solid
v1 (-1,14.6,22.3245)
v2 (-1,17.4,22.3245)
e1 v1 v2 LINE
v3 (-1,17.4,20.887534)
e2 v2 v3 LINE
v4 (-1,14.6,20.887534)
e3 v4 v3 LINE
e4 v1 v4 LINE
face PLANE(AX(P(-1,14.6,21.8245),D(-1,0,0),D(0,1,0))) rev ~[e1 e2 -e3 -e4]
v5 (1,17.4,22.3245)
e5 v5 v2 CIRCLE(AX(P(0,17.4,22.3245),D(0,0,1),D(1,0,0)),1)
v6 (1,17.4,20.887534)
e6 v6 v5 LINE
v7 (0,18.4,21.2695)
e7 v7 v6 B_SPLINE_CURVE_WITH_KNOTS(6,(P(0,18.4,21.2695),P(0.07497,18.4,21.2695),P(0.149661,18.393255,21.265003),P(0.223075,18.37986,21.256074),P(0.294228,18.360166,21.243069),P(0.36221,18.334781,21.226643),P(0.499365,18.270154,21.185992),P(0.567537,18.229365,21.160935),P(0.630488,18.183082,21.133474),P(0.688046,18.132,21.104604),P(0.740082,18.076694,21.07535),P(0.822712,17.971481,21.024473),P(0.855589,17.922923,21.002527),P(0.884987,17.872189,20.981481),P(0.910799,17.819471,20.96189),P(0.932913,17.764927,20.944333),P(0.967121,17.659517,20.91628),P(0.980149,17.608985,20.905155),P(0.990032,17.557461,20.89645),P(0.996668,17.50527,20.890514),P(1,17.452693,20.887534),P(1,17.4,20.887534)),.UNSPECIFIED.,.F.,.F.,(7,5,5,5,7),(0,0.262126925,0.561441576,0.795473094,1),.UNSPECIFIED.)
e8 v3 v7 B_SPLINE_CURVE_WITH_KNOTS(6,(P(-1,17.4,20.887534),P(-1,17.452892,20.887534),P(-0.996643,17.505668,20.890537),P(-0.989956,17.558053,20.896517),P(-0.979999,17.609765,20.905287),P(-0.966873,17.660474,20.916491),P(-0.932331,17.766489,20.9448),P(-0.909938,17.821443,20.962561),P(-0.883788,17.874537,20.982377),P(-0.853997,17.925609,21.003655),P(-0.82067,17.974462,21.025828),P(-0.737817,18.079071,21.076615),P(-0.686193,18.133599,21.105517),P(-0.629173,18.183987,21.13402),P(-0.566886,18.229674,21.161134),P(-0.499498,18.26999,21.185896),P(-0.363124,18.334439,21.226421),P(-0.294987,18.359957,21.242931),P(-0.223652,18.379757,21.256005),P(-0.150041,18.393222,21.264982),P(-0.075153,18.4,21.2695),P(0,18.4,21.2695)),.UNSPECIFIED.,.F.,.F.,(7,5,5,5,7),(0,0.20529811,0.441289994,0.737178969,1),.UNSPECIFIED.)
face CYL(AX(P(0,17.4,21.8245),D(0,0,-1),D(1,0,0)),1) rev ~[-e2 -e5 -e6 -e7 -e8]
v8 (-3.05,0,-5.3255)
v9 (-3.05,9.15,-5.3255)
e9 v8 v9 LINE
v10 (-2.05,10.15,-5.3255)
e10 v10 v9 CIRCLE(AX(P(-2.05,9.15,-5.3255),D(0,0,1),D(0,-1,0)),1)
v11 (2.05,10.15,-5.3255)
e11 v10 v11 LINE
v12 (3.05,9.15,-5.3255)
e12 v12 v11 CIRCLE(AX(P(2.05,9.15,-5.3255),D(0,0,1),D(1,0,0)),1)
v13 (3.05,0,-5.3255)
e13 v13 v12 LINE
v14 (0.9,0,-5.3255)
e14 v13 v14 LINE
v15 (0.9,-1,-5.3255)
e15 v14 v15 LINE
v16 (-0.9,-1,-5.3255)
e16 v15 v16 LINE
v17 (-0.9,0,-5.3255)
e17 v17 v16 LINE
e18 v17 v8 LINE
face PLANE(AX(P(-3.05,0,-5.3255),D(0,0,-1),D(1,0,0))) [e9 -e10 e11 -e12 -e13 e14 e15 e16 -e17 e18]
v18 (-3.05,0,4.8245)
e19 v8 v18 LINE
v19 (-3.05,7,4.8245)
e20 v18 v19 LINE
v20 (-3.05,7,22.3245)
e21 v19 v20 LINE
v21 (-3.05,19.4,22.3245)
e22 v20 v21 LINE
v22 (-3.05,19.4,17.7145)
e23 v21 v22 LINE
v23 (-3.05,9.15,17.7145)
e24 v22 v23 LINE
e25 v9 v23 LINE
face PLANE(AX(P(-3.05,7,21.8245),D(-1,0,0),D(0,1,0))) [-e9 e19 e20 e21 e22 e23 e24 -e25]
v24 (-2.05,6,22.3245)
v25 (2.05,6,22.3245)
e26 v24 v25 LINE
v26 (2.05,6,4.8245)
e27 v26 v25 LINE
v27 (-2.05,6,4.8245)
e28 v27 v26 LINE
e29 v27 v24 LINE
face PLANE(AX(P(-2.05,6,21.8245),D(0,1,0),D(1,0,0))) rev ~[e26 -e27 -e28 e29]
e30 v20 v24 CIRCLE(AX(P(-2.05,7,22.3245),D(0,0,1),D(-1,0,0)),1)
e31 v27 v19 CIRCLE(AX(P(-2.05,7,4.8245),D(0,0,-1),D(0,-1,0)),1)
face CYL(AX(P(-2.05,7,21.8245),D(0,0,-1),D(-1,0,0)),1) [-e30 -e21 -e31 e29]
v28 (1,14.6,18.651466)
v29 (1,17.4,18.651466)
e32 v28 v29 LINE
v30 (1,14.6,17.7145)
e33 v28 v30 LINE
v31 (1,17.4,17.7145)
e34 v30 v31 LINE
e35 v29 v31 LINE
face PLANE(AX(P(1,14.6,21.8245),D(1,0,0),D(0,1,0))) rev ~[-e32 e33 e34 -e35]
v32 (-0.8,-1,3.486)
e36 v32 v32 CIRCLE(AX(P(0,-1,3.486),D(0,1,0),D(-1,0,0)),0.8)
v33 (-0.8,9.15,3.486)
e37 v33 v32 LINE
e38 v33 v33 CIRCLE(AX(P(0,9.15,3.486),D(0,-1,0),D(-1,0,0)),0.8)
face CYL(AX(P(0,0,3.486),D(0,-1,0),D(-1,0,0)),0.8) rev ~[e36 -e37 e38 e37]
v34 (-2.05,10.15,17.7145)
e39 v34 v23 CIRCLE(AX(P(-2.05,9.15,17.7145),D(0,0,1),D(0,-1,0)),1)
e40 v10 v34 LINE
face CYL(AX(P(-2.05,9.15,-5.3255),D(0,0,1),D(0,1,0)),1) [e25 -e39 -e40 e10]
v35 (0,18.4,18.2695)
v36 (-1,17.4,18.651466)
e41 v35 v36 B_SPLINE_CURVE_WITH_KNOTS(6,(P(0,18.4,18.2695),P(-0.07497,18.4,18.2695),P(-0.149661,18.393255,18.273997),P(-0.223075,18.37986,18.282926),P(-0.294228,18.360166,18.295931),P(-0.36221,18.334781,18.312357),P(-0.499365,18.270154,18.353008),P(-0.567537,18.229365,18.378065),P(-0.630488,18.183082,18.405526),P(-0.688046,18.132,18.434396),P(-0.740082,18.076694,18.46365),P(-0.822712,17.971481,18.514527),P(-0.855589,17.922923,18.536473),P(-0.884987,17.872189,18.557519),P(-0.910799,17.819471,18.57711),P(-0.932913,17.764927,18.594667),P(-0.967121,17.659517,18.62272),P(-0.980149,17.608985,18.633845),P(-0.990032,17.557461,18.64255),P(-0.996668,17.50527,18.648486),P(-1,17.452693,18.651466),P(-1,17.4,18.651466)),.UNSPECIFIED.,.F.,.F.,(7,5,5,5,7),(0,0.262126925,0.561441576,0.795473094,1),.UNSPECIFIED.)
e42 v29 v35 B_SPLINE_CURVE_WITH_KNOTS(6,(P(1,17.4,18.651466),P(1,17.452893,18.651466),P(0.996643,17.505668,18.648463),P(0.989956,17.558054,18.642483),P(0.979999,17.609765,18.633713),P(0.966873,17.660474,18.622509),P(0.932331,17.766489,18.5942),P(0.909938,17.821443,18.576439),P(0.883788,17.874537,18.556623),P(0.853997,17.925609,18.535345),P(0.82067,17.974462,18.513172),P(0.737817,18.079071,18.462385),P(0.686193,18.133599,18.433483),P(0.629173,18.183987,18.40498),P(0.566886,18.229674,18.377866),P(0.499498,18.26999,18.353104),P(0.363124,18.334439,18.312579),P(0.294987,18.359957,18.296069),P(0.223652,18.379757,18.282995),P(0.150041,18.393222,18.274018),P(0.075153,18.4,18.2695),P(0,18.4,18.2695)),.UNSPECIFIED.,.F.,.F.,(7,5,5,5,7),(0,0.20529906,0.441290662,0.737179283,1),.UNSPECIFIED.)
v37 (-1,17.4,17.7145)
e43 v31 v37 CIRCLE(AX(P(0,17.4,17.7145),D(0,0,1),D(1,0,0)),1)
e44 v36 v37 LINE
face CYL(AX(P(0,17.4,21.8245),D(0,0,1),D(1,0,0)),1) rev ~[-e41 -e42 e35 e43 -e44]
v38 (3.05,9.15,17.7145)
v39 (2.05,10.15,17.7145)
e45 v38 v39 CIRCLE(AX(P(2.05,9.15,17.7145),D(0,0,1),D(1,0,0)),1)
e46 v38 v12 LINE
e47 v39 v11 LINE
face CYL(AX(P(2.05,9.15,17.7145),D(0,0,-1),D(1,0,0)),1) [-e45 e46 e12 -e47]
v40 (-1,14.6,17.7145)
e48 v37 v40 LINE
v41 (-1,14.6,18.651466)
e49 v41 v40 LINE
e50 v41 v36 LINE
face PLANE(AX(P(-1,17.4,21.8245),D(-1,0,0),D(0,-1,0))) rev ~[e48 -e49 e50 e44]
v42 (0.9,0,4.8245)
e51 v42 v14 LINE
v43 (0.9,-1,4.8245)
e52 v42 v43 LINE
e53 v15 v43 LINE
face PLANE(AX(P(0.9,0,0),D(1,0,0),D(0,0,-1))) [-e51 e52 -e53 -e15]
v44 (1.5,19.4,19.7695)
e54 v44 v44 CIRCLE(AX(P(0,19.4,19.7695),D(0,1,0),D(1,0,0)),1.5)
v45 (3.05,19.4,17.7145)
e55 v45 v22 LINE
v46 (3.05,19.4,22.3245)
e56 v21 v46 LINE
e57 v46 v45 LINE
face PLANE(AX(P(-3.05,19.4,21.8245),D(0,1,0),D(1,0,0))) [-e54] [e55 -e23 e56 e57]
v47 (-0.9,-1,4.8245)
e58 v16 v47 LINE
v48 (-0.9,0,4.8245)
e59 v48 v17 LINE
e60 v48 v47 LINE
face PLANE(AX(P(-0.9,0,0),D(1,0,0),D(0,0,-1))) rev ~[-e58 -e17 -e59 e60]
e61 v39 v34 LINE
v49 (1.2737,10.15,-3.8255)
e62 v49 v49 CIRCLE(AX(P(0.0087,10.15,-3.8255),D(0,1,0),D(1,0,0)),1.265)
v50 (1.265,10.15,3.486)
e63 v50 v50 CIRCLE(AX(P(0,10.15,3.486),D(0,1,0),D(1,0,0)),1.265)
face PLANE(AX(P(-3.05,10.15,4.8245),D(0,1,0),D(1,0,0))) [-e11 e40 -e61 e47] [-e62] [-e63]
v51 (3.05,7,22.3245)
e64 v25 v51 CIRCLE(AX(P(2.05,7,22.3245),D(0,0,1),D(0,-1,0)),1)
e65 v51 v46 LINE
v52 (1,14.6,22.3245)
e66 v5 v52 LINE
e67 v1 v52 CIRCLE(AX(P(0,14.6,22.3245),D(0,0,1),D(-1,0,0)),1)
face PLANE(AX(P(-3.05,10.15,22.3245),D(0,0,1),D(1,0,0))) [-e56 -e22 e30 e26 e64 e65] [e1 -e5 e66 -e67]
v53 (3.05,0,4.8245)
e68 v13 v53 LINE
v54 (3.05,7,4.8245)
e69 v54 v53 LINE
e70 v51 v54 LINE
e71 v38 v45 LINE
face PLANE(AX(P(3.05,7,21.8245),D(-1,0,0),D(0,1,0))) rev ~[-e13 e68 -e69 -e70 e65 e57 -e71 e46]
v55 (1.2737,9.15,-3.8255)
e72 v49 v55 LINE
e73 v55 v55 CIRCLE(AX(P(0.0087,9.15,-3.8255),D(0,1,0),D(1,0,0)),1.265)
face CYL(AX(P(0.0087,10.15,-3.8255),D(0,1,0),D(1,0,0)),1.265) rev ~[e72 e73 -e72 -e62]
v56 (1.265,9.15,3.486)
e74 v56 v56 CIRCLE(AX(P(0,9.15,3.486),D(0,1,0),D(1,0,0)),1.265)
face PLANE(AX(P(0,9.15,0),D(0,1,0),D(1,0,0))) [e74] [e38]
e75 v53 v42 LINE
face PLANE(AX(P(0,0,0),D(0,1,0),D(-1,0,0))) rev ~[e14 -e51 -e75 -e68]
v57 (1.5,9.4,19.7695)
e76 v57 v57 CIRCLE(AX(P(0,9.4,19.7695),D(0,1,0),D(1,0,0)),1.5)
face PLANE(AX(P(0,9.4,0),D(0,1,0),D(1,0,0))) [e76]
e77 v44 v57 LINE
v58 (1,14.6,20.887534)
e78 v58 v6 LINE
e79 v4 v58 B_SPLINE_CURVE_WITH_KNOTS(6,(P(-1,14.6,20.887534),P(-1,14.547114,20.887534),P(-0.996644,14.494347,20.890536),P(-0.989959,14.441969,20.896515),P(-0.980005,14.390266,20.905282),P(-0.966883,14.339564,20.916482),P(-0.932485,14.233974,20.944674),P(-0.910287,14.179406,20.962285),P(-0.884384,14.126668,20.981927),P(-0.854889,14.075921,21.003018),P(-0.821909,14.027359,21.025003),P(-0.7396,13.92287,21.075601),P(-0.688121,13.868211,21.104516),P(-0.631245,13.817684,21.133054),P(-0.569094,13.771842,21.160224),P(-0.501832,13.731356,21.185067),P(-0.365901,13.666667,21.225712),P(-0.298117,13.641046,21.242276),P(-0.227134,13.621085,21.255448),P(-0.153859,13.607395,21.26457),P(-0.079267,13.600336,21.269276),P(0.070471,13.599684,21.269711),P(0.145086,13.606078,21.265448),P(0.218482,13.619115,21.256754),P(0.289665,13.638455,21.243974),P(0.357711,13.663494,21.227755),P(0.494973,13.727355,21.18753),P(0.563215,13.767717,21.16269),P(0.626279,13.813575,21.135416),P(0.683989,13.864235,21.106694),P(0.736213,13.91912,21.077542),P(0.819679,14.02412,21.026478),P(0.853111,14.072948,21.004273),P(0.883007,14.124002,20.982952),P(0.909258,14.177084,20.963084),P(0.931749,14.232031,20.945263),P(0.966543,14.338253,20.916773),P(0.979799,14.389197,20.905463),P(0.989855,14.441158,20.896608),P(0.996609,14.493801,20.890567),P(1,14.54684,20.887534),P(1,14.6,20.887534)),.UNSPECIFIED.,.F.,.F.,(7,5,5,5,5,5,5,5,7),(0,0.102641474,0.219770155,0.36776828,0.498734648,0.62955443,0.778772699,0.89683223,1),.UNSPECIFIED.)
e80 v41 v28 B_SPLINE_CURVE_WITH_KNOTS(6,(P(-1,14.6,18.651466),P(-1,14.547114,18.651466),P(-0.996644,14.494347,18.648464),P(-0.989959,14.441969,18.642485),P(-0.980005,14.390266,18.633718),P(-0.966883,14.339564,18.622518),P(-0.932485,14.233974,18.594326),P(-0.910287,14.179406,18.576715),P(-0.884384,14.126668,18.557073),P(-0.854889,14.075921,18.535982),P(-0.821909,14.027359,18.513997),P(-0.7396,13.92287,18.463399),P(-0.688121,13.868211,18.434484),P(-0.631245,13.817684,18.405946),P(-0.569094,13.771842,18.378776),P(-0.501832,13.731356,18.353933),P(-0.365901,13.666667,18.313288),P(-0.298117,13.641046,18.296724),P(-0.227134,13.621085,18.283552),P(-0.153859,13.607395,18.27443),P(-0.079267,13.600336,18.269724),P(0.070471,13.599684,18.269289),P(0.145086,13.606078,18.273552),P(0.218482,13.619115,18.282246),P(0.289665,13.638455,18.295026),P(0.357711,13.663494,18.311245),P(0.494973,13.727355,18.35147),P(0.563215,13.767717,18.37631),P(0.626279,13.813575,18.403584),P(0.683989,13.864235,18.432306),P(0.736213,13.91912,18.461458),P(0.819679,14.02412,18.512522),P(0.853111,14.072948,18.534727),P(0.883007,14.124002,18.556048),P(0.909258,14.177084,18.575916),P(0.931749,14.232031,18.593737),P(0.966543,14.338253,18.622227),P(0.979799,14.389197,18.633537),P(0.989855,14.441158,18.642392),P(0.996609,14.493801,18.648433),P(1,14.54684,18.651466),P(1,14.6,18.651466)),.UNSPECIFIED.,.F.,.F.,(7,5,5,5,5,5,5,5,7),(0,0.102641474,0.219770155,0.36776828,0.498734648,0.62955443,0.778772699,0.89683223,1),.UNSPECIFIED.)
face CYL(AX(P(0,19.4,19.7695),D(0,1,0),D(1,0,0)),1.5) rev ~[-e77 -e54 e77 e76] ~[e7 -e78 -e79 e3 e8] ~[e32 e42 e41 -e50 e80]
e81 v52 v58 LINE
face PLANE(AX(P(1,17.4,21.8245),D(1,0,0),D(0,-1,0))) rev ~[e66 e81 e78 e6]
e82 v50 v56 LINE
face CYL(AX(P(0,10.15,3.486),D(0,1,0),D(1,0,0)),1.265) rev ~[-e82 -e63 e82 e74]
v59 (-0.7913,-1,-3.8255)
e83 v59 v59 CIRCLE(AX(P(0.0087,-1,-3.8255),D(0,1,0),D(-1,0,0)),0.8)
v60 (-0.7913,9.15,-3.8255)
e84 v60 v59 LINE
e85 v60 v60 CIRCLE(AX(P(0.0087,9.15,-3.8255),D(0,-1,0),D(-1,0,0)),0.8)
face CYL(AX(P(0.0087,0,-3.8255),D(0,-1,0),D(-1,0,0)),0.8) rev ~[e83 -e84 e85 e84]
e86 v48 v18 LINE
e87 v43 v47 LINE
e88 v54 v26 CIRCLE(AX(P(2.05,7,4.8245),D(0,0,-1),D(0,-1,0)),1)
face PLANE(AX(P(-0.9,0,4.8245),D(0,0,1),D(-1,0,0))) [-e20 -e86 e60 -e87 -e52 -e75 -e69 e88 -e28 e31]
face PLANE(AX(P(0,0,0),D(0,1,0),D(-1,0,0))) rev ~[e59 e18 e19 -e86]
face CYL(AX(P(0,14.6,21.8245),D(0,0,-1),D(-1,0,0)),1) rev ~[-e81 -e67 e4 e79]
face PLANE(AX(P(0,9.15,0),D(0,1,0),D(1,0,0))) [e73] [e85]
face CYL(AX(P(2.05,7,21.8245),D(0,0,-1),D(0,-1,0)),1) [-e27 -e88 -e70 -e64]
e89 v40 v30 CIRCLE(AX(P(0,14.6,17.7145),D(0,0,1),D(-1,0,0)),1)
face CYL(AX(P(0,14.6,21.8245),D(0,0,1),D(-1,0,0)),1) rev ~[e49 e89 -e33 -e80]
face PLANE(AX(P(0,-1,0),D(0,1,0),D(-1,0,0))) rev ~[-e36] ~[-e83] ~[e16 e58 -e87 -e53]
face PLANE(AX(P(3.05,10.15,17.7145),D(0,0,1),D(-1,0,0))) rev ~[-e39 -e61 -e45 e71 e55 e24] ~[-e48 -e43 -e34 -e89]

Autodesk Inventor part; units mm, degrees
ref_plane "YZ Plane" through (0, 0, 0) normal (1, 0, 0) x (0, 1, 0)
ref_plane "XZ Plane" through (0, 0, 0) normal (0, 1, 0) x (-1, 0, 0)
ref_plane "XY Plane" through (0, 0, 0) normal (0, 0, 1) x (1, 0, 0)
sketch "Sketch1" plane through (0, 0, 0) normal (0, 1, 0) x (-1, 0, 0)
  line L0 (3.05, -5.3255) -> (-3.05, -5.3255)
  line L1 (-3.05, -5.3255) -> (-3.05, 4.8245)
  line L2 (-3.05, 4.8245) -> (3.05, 4.8245)
  line L3 (3.05, 4.8245) -> (3.05, -5.3255)
  line L4 (0.9, 4.8245) -> (-0.9, 4.8245)
  line L5 (0.9, 4.8245) -> (0.9, -5.3255)
  line L6 (-0.9, 4.8245) -> (-0.9, -5.3255)
  circle A0 centre (0, 3.486) radius 0.8
  circle A1 centre (-0.0087, -3.8255) radius 0.8
  line L7 (0, 4.8245) -> (0, -5.3255)
  line L8 (-3.05, 0) -> (3.05, 0)
  point P0 (0, 0)
  dimension "d13" = 6.1
  dimension "d44" = 1.8
  dimension "d45" = 2.15
  dimension "d46" = 1.6
  dimension "d47" = 1.6
extrude "Extrusion1" add sketch "Sketch1" along normal blind 10.15 contours L0 L5 L8 L3 | L0 L7 A1 L8 L5 | L8 L5 L2 L3 | L0 L6 L8 L7 A1 | L8 L7 A0 L2 L5 | L0 L1 L8 L6 | L8 L6 L2 L7 A0 | L8 L1 L2 L6
sketch "Sketch11" plane through (-3.05, 0, 4.8245) normal (0, 0, 1) x (1, 0, 0)
  point P0 (3.05, 0)
extrude "Extrusion6" add sketch "Sketch1" against normal blind 1 contours L0 L7 A1 L8 L5 | L0 L6 L8 L7 A1 | L8 L7 A0 L2 L5 | L8 L6 L2 L7 A0
sketch "Sketch12" plane through (0, 10.15, 0) normal (0, 1, 0) x (1, 0, 0)
  circle A0 centre (0.0087, 3.8255) radius 1.265
  circle A1 centre (0, -3.486) radius 1.265
  circle A2 centre (0, -3.486) radius 0.8 projected
  circle A3 centre (0.0087, 3.8255) radius 0.8 projected
  point P0 (0, 0)
  dimension "d52" = 2.53
  dimension "d53" = 2.53
extrude "Extrusion7" cut sketch "Sketch12" against normal blind 1 contours A0 | A1 | A2 | A3
sketch "Sketch13" plane through (-3.05, 10.15, 4.8245) normal (0, 0, 1) x (1, 0, 0)
  line L0 (0, 0) -> (0, -4.15)
  line L1 (0, -10.15) -> (0, 0) projected
  line L2 (0, -4.15) -> (6.1, -4.15)
  line L3 (6.1, -10.15) -> (6.1, 0) projected
  line L4 (6.1, 0) -> (6.1, -4.15)
  line L5 (0, 0) -> (6.1, 0)
  point P0 (3.05, -10.15)
  dimension "d56" = 4.15
extrude "Extrusion8" add sketch "Sketch13" along normal blind 17
sketch "Sketch17" plane through (-3.05, 10.15, 21.8245) normal (0, 0, 1) x (1, 0, 0)
  line L0 (6.1, 0) -> (0, 0) projected
  line L1 (6.1, 0) -> (14.3904, 5.5919)
  line L2 (6.1, 0) -> (16.1, 0) construction
  line L3 (14.3904, 5.5919) -> (10.1964, 11.8097)
  line L4 (10.1964, 11.8097) -> (13.5955, 14.1024)
  line L5 (13.5955, 14.1024) -> (17.7894, 7.8846)
  line L6 (17.7894, 7.8846) -> (19.7132, 5.0325)
  line L7 (6.1, -10.15) -> (6.1, -4.15) projected
  line L8 (19.7132, 5.0325) -> (6.1, -4.15)
  line L9 (6.1, 0) -> (6.1, -4.15)
  point P0 (3.05, -10.15)
  dimension "d72" = 10
  dimension "d73" = 34
  dimension "d74" = 7.5
  dimension "d75" = 4.1
extrude "Extrusion12" [suppressed]
sketch "Sketch14" plane through (0, 10.15, 0) normal (0, 1, 0) x (1, 0, 0)
  line L0 (3.05, 5.3255) -> (3.05, -21.8245) projected
  line L1 (3.05, -21.8245) -> (3.05, -17.7145)
  line L2 (3.05, -17.7145) -> (-3.05, -17.7145)
  line L3 (-3.05, 5.3255) -> (-3.05, -21.8245) projected
  line L4 (-3.05, -21.8245) -> (3.05, -21.8245)
  point P0 (0, 0)
  dimension "d59" = 4.11
extrude "Extrusion9" add sketch "Sketch14" along normal blind 9.25
sketch "Sketch16" plane through (0, 19.4, 0) normal (0, 1, 0) x (1, 0, 0)
  circle A0 centre (0, -19.7695) radius 1.5
  line L0 (-3.05, -21.8245) -> (3.05, -21.8245) projected
  line L1 (3.05, -21.8245) -> (3.05, -17.7145) projected
  point P0 (0, 0)
  point P1 (0, -21.8245)
  dimension "d67" = 3
  dimension "d68" = 2.055
  dimension "d69" = 3.05
extrude "Extrusion11" cut sketch "Sketch16" against normal blind 10
sketch "Sketch15" plane through (-3.05, 10.15, 21.8245) normal (0, 0, 1) x (1, 0, 0)
  line L0 (3.05, 7.25) -> (3.05, 4.45) construction
  line L1 (6.1, 0) -> (6.1, 9.25) projected
  line L2 (2.05, 7.25) -> (2.05, 4.45)
  line L3 (4.05, 4.45) -> (4.05, 7.25)
  arc A0 (4.05, 7.25) -> (2.05, 7.25) centre (3.05, 7.25) ccw
  arc A1 (2.05, 4.45) -> (4.05, 4.45) centre (3.05, 4.45) ccw
  line L4 (0, 9.25) -> (6.1, 9.25) projected
  line L5 (3.05, 9.25) -> (3.05, 8.25)
  point P0 (3.05, -10.15)
  point P1 (3.05, 5.85)
  dimension "d62" = 1.4
  dimension "d63" = 2
  dimension "d64" = 3.05
  dimension "d94" = 2.05
  dimension "d97" = 1
extrude "Extrusion10" cut sketch "Sketch15" against normal through all
sketch "Sketch20" plane through (10.5455, 24.2524, 21.8245) normal (-0.5591929, 0.8290376, 0) x (0.8290376, 0.5591929, 0)
  circle A0 centre (-2.05, 2.05) radius 1.5
  line L0 (-4.1, 0) -> (-4.1, 4.1) projected
  line L1 (0, 0) -> (-4.1, 0) projected
  point P0 (-22.3044, 21.8245)
  point P1 (-2.05, 0)
  dimension "d82" = 3
  dimension "d83" = 2.05
  dimension "d84" = 2.05
extrude "Extrusion14" [suppressed]
sketch "Sketch18" plane through (-3.05, 10.15, 21.8245) normal (0, 0, 1) x (1, 0, 0)
  line L0 (12.6984, 11.7664) -> (14.2641, 9.4451) construction
  line L1 (11.973, 11.2771) -> (13.5387, 8.9558)
  line L2 (14.9895, 9.9344) -> (13.4238, 12.2557)
  arc A0 (13.4238, 12.2557) -> (11.973, 11.2771) centre (12.6984, 11.7664) ccw
  arc A1 (13.5387, 8.9558) -> (14.9895, 9.9344) centre (14.2641, 9.4451) ccw
  line L3 (19.7132, 5.0325) -> (13.5955, 14.1024) projected
  line L4 (10.1964, 11.8097) -> (13.5955, 14.1024) projected
  point P0 (3.05, -10.15)
  point P1 (13.4813, 10.6057)
  point P2 (12.2091, 12.4918)
  dimension "d78" = 1.4
  dimension "d79" = 1.75
  dimension "d89" = 0.56
  dimension "d90" = 2.05
extrude "Extrusion13" cut sketch "Sketch18" against normal blind 4.1
sketch "Sketch21" plane through (13.8787, 15.6447, 19.7745) normal (-0.5591929, 0.8290376, 0) x (0.8290376, 0.5591929, 0)
  circle A0 centre (0, 0) radius 0.868
  point P0 (-20.2544, 19.7745)
extrude "Extrusion15" [suppressed]
mirror "Mirror3" about plane through (0, 0, 0) normal (1, 0, 0) of "Extrusion13"
fillet "Fillet1" radius 1 2 edges at (3.05, 10.15, 6.1945) (-3.05, 10.15, 6.1945)
fillet "Fillet2" [suppressed]
fillet "Fillet3" radius 1 2 edges at (3.05, 6, 13.3245) (-3.05, 6, 13.3245)
sketch "Sketch33" plane through (-3.05, 10.15, 21.8245) normal (0, 0, 1) x (1, 0, 0)
  line L0 (4.05, 7.25) -> (4.05, 4.45) projected
  arc A0 (2.05, 4.45) -> (4.05, 4.45) centre (3.05, 4.45) ccw projected
  line L1 (2.05, 4.45) -> (2.05, 7.25) projected
  arc A1 (4.05, 7.25) -> (2.05, 7.25) centre (3.05, 7.25) ccw projected
  arc A2 (0, -3.15) -> (1, -4.15) centre (1, -3.15) ccw projected
  line L2 (1, -4.15) -> (5.1, -4.15) projected
  arc A3 (5.1, -4.15) -> (6.1, -3.15) centre (5.1, -3.15) ccw projected
  line L3 (6.1, -3.15) -> (6.1, 9.25) projected
  line L4 (0, 9.25) -> (6.1, 9.25) projected
  line L5 (0, -3.15) -> (0, 9.25) projected
  point P0 (3.05, -10.15)
extrude "Extrusion17" add sketch "Sketch33" along normal blind 0.5
sketch "Sketch22" plane through (0, 9.4, 19.7695) normal (0, 1, 0) x (1, 0, 0)
  circle A0 centre (0, 0) radius 1.5 projected
  point P0 (0, 19.7695)
extrude "Extrusion16" [suppressed]
equation "\"d13\" = base_width"
equation "\"d45\" = -0.5 * d44 + 0.5 * d13"
equation "\"d4\" = base_length"
equation "\"base_width\" = 6.1"
equation "\"base_length\" = 10.15"
equation "\"base_screw_diameter\" = 1.5"
equation "\"base_screw_spacing_edge\" = 8.5"
equation "\"multi_angle\" = 34deg"
properties part number "reinforced_holder"
